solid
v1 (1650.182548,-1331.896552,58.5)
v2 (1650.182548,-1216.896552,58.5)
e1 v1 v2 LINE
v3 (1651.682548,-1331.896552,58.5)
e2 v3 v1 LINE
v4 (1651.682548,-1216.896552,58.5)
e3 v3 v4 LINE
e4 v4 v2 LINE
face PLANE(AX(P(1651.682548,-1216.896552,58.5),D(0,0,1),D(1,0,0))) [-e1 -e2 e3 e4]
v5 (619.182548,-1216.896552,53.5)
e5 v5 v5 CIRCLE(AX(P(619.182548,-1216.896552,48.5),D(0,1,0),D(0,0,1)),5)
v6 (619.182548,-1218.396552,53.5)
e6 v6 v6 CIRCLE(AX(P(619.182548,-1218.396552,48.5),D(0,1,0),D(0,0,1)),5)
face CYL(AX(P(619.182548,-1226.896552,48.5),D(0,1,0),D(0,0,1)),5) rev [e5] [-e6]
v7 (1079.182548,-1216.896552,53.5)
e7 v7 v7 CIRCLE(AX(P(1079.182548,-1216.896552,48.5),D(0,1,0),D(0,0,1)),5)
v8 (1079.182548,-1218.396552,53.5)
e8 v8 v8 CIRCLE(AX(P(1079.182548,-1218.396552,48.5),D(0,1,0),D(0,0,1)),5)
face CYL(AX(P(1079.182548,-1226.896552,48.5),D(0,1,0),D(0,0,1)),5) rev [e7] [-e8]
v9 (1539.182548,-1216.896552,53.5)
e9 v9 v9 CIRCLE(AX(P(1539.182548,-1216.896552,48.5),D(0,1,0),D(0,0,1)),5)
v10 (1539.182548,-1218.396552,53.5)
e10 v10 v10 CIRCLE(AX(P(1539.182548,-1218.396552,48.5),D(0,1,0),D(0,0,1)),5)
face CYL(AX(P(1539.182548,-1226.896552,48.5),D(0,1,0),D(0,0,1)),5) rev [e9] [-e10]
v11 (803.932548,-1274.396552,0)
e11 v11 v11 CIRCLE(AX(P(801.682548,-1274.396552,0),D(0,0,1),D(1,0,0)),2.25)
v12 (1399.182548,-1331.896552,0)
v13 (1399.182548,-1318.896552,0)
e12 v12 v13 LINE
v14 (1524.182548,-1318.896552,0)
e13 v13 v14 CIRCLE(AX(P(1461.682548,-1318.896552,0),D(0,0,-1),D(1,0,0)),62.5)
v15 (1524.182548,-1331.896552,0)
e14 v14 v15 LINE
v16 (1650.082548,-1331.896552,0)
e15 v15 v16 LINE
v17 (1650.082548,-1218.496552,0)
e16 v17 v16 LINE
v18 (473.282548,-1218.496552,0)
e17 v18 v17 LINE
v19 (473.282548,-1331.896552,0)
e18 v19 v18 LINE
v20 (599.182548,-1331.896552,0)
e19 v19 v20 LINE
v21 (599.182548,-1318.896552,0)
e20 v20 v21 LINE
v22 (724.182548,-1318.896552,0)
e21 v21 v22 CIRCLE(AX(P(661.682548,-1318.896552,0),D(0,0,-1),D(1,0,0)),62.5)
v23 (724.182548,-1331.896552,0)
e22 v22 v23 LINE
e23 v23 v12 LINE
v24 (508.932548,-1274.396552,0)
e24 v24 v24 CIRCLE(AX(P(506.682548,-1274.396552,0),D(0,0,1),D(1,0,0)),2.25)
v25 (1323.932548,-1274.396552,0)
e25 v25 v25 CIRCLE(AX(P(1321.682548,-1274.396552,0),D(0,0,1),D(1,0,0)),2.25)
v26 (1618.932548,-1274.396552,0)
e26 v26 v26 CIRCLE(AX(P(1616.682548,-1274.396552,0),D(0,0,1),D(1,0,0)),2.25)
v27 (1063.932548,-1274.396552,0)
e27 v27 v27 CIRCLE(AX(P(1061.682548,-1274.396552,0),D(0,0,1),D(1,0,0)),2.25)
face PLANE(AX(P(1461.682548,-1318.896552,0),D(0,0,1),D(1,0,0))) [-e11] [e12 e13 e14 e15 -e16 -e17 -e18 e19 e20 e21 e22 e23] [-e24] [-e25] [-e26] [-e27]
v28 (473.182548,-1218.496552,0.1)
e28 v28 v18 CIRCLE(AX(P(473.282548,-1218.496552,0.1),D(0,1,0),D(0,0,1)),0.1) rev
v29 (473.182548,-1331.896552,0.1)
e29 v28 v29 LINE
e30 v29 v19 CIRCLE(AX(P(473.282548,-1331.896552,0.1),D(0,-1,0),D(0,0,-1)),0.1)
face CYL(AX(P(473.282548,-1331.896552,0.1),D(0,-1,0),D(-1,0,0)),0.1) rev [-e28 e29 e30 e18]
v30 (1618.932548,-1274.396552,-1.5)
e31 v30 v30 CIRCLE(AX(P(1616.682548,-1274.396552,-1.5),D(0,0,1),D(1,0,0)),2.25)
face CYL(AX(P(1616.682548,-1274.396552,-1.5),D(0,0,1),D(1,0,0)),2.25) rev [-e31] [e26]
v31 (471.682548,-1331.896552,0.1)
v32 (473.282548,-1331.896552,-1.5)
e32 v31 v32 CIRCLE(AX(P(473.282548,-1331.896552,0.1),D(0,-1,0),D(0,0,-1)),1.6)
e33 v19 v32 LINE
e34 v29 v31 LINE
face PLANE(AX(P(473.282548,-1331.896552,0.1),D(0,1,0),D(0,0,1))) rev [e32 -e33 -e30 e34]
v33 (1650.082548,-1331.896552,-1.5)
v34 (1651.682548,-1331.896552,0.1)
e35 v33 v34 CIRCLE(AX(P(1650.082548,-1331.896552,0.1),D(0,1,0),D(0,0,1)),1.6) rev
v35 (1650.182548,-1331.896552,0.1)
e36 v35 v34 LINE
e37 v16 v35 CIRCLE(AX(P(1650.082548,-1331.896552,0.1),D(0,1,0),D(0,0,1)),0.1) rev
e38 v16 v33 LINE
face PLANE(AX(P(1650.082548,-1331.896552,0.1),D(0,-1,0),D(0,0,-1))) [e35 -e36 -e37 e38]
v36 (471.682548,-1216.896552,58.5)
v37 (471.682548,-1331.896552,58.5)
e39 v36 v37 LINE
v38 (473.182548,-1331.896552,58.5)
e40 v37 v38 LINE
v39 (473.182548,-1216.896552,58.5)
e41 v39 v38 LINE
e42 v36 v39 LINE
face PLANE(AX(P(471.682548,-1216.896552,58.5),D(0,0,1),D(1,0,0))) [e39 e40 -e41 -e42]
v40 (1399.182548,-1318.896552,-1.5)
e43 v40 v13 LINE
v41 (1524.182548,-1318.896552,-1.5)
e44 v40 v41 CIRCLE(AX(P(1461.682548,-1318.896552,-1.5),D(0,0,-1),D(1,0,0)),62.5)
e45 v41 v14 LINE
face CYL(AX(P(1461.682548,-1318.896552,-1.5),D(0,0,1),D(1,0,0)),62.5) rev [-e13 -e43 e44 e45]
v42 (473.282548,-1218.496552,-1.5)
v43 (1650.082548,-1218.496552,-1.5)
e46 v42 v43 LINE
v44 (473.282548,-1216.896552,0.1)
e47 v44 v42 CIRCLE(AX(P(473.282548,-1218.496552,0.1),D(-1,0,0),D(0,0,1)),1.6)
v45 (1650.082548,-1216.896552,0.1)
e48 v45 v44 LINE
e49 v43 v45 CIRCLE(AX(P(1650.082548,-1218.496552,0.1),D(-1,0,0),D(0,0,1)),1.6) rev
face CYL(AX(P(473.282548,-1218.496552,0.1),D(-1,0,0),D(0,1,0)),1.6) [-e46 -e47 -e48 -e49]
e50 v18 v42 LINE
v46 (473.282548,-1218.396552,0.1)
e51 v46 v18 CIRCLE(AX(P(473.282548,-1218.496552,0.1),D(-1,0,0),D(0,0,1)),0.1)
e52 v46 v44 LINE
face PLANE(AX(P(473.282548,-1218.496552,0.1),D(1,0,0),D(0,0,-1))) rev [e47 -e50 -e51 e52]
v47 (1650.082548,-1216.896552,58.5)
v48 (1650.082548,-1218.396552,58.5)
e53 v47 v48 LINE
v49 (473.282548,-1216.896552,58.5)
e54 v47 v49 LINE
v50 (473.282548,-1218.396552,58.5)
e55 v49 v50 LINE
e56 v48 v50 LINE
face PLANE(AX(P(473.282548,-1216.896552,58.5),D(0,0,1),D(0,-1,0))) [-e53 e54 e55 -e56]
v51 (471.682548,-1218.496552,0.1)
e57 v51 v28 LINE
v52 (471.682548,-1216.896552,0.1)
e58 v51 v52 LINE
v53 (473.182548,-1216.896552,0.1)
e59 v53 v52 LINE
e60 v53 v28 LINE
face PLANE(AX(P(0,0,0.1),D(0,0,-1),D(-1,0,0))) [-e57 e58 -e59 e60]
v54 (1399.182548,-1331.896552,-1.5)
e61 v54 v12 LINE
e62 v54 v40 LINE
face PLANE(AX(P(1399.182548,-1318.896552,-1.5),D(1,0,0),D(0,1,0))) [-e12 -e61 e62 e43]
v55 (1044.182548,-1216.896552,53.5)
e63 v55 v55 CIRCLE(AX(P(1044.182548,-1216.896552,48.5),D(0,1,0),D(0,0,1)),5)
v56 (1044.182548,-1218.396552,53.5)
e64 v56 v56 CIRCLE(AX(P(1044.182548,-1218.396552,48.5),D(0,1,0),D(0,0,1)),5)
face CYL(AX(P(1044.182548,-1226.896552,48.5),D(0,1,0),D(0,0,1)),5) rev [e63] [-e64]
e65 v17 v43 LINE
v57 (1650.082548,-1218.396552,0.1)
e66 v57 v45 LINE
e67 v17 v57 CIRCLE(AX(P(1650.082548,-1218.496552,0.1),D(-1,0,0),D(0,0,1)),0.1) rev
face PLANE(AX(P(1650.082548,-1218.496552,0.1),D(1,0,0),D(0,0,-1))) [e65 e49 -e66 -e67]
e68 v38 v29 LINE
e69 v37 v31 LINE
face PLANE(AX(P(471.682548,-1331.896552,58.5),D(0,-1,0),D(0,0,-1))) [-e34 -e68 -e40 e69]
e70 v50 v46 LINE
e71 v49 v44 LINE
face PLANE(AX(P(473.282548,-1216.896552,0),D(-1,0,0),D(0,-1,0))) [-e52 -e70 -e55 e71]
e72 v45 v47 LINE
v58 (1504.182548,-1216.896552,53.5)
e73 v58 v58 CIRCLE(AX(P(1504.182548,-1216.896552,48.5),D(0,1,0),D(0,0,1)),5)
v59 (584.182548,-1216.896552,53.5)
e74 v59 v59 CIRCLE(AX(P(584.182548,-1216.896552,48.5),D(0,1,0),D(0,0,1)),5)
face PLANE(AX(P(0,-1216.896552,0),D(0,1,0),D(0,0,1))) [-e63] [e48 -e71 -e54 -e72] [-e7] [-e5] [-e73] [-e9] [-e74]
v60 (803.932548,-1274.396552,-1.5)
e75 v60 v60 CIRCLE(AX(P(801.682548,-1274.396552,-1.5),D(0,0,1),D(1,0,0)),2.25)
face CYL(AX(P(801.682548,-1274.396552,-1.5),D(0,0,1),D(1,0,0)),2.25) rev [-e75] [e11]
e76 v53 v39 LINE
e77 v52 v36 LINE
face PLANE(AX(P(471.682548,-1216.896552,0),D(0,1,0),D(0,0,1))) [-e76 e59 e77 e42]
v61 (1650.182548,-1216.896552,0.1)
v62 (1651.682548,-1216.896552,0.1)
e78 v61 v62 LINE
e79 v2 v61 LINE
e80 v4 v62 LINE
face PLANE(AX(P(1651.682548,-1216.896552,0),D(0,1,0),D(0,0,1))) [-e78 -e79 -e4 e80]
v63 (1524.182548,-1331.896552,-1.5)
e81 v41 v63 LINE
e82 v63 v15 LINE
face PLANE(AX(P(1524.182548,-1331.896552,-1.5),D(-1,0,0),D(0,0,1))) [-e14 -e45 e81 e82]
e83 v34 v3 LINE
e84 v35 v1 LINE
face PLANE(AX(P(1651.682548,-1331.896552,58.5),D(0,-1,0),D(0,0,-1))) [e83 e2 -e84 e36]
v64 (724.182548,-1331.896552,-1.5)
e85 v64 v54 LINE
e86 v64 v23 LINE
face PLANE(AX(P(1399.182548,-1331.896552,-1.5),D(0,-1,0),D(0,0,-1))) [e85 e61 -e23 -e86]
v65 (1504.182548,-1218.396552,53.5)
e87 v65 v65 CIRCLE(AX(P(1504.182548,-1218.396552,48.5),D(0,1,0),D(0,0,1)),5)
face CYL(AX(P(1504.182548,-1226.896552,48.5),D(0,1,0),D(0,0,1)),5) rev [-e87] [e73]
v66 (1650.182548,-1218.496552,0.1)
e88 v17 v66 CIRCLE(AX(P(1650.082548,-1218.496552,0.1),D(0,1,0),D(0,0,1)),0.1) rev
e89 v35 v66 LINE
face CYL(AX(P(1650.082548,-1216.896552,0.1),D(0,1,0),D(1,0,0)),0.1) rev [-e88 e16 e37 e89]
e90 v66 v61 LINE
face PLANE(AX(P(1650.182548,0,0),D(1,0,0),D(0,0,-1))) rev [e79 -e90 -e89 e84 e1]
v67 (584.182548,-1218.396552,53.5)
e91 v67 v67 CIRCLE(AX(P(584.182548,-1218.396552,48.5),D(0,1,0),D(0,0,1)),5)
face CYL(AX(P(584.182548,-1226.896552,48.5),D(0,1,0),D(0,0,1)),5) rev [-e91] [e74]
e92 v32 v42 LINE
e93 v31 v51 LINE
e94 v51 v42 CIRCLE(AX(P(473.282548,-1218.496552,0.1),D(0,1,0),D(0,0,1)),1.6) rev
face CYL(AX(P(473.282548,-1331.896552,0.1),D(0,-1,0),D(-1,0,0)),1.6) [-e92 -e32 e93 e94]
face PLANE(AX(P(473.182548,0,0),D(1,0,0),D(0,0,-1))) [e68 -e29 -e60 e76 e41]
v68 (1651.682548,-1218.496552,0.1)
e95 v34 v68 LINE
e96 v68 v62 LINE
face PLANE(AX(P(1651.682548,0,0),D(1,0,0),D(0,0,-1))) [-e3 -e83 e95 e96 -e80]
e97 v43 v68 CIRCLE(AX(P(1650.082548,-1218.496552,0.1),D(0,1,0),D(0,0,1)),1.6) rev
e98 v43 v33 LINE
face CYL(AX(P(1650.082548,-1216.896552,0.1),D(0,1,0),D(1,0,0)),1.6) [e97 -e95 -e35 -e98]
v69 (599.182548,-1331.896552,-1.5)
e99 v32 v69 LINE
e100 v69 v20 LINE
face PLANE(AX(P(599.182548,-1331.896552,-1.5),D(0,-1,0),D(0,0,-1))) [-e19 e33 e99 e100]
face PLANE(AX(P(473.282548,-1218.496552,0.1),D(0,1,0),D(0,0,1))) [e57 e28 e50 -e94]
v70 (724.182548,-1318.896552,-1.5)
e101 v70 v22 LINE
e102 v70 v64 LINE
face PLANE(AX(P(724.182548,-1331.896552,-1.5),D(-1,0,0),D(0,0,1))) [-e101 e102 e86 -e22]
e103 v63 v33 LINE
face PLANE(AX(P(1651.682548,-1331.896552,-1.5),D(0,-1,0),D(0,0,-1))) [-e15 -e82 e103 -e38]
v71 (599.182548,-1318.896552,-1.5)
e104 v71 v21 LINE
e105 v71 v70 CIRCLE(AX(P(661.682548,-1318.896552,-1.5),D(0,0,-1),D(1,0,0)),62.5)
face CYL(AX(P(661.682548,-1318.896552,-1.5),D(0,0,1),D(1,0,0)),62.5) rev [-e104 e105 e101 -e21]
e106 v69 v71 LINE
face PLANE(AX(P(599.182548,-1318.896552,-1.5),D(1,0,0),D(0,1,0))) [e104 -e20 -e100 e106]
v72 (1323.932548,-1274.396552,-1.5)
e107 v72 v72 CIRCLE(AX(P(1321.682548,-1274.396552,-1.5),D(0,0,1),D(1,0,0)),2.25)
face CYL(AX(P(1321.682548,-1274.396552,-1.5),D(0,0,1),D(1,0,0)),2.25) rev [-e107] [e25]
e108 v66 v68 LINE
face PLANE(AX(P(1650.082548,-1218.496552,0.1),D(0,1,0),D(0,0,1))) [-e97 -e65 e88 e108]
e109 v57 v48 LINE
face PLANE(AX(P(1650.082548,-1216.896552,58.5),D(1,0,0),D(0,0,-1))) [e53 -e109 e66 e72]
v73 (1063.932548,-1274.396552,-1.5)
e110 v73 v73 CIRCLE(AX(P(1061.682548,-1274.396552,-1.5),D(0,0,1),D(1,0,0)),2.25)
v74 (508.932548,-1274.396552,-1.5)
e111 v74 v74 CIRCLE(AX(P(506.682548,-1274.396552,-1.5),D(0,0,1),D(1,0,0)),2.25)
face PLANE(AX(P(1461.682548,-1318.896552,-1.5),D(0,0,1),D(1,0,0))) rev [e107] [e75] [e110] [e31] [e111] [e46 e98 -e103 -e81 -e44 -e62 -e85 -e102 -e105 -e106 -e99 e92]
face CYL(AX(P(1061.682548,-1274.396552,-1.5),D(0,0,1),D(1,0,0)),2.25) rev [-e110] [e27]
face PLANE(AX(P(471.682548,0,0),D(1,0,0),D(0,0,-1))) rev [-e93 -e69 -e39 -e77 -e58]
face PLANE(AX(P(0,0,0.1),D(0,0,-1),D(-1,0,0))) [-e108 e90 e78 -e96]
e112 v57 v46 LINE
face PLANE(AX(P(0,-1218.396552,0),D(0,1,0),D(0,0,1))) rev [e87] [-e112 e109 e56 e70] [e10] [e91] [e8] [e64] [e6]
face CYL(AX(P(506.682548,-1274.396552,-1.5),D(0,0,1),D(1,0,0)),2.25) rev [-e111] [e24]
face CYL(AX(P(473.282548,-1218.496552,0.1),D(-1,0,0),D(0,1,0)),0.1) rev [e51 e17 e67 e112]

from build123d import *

# Parameters (mm, degrees)
SKETCH_1_R                         = 2.25
SM_BASE_FLANGE_1_DEPTH             = 1.5
SM_EDGE_FLANGE_1_STRIP_W           = 6.2
SM_EDGE_FLANGE_1_STRIP_H           = 1.5
SM_EDGE_FLANGE_1_STRIP_CUT_DEPTH   = 115
SM_EDGE_FLANGE_1_STRIP_2_W         = 6.2
SM_EDGE_FLANGE_1_STRIP_2_H         = 1.5
SM_EDGE_FLANGE_1_STRIP_CUT_2_DEPTH = 115
SM_EDGE_FLANGE_1_DEPTH             = 115
SM_EDGE_FLANGE_1_BEND_DEPTH        = 115
SM_START                           = 471.682547587
SM_EDGE_FLANGE_2_DEPTH             = 1180
SM_EDGE_FLANGE_2_2_DEPTH           = 1.6
SM_START_2                         = 1650.082547587
SM_EDGE_FLANGE_2_3_DEPTH           = 1.6
SM_START_3                         = 473.282547587
SM_EDGE_FLANGE_2_4_DEPTH           = 1176.8
SKETCH_15_R                        = 5
CUT_EXTRUDE_1_DEPTH                = 10


# Read off the part's stored shape, not the designer's step: 边线-法兰2
# Sheet-metal steps are written as plain solids
with BuildPart() as part:
    # Sketch 1 → 基体-法兰1 (new body)
    with BuildSketch(Plane.XY):
        with BuildLine():
            Line((471.682547587, -1331.896552128), (473.182547587, -1331.896552128))
            Line((473.182547587, -1331.896552128), (473.919147587, -1331.896552128))
            Line((473.919147587, -1331.896552128), (599.182547587, -1331.896552128))
            Line((599.182547587, -1331.896552128), (599.182547587, -1318.896552128))
            ThreePointArc((599.182547587, -1318.896552128), (661.682547587, -1256.396552128), (724.182547587, -1318.896552128))
            Line((724.182547587, -1318.896552128), (724.182547587, -1331.896552128))
            Line((724.182547587, -1331.896552128), (1399.182547587, -1331.896552128))
            Line((1399.182547587, -1331.896552128), (1399.182547587, -1318.896552128))
            ThreePointArc((1399.182547587, -1318.896552128), (1461.682547587, -1256.396552128), (1524.182547587, -1318.896552128))
            Line((1524.182547587, -1318.896552128), (1524.182547587, -1331.896552128))
            Line((1524.182547587, -1331.896552128), (1649.445947587, -1331.896552128))
            Line((1649.445947587, -1331.896552128), (1650.182547587, -1331.896552128))
            Line((1650.182547587, -1331.896552128), (1651.682547587, -1331.896552128))
            Line((1651.682547587, -1331.896552128), (1651.682547587, -1216.896552128))
            Line((1651.682547587, -1216.896552128), (471.682547587, -1216.896552128))
            Line((471.682547587, -1216.896552128), (471.682547587, -1331.896552128))
        make_face()
        with Locations((801.682547587, -1274.396552128)):
            Circle(SKETCH_1_R, mode=Mode.SUBTRACT)
        with Locations((1321.682547587, -1274.396552128)):
            Circle(SKETCH_1_R, mode=Mode.SUBTRACT)
        with Locations((506.682547587, -1274.396552128)):
            Circle(SKETCH_1_R, mode=Mode.SUBTRACT)
        with Locations((1061.682547587, -1274.396552128)):
            Circle(SKETCH_1_R, mode=Mode.SUBTRACT)
        with Locations((1616.682547587, -1274.396552128)):
            Circle(SKETCH_1_R, mode=Mode.SUBTRACT)
    extrude(amount=-SM_BASE_FLANGE_1_DEPTH)

    # 边线-法兰1 strip (across the edge) → 边线-法兰1 strip cut (cut)
    with BuildSketch(Plane(origin=(1651.682547587, -1331.896552128, 0), x_dir=(-1, 0, 0), z_dir=(0, 1, 0))):
        with Locations((-1.5, -0.75)):
            Rectangle(SM_EDGE_FLANGE_1_STRIP_W, SM_EDGE_FLANGE_1_STRIP_H)
    extrude(amount=SM_EDGE_FLANGE_1_STRIP_CUT_DEPTH, mode=Mode.SUBTRACT)

    # 边线-法兰1 strip 2 (across the edge) → 边线-法兰1 strip cut 2 (cut)
    with BuildSketch(Plane(origin=(471.682547587, -1216.896552128, 0), x_dir=(1, 0, 0), z_dir=(0, -1, 0))):
        with Locations((-1.5, -0.75)):
            Rectangle(SM_EDGE_FLANGE_1_STRIP_2_W, SM_EDGE_FLANGE_1_STRIP_2_H)
    extrude(amount=SM_EDGE_FLANGE_1_STRIP_CUT_2_DEPTH, mode=Mode.SUBTRACT)

    # 边线-法兰1 section (across the edge) → 边线-法兰1 (add)
    with BuildSketch(Plane(origin=(1651.682547587, -1331.896552128, 0), x_dir=(-1, 0, 0), z_dir=(0, 1, 0))):
        with BuildLine():
            Line((0, 0.1), (0, 58.5))
            Line((0, 58.5), (1.5, 58.5))
            Line((1.5, 58.5), (1.5, 0.1))
            ThreePointArc((1.5, 0.1), (1.529289322, 0.029289322), (1.6, 0))
            Line((1.6, 0), (1.6, -1.5))
            ThreePointArc((1.6, -1.5), (0.46862915, -1.03137085), (0, 0.1))
        make_face()
    extrude(amount=SM_EDGE_FLANGE_1_DEPTH)

    # 边线-法兰1 section 2 (across the edge) → 边线-法兰1 bend (add)
    with BuildSketch(Plane(origin=(471.682547587, -1216.896552128, 0), x_dir=(1, 0, 0), z_dir=(0, -1, 0))):
        with BuildLine():
            Line((0, 0.1), (0, 58.5))
            Line((0, 58.5), (1.5, 58.5))
            Line((1.5, 58.5), (1.5, 0.1))
            ThreePointArc((1.5, 0.1), (1.529289322, 0.029289322), (1.6, 0))
            Line((1.6, 0), (1.6, -1.5))
            ThreePointArc((1.6, -1.5), (0.46862915, -1.03137085), (0, 0.1))
        make_face()
    extrude(amount=SM_EDGE_FLANGE_1_BEND_DEPTH)

    # 边线-法兰2 outline → 边线-法兰2 (cut)
    with BuildSketch(Plane.YZ.offset(SM_START)):
        with BuildLine():
            Line((-1218.396552128, 0.1), (-1218.496552128, 0.1))
            Line((-1218.496552128, 0.1), (-1218.496552128, 0))
            ThreePointArc((-1218.496552128, 0), (-1218.42584145, 0.029289322), (-1218.396552128, 0.1))
        make_face()
        with BuildLine():
            ThreePointArc((-1216.896552128, 0.1), (-1217.365181278, -1.03137085), (-1218.496552128, -1.5))
            Line((-1218.496552128, -1.5), (-1216.896552128, -1.5))
            Line((-1216.896552128, -1.5), (-1216.896552128, 0.1))
        make_face()
    extrude(amount=SM_EDGE_FLANGE_2_DEPTH, mode=Mode.SUBTRACT)

    # Sm Edge Flange 2 2 outline → Sm Edge Flange 2 2 (cut)
    with BuildSketch(Plane.YZ.offset(SM_START)):
        with BuildLine():
            Line((-1216.896552128, 0.1), (-1218.396552128, 0.1))
            ThreePointArc((-1218.396552128, 0.1), (-1218.42584145, 0.029289322), (-1218.496552128, 0))
            Line((-1218.496552128, 0), (-1218.496552128, -1.5))
            ThreePointArc((-1218.496552128, -1.5), (-1217.365181278, -1.03137085), (-1216.896552128, 0.1))
        make_face()
    extrude(amount=SM_EDGE_FLANGE_2_2_DEPTH, mode=Mode.SUBTRACT)

    # Sm Edge Flange 2 3 outline → Sm Edge Flange 2 3 (cut)
    with BuildSketch(Plane.YZ.offset(SM_START_2)):
        with BuildLine():
            Line((-1216.896552128, 0.1), (-1218.396552128, 0.1))
            ThreePointArc((-1218.396552128, 0.1), (-1218.42584145, 0.029289322), (-1218.496552128, 0))
            Line((-1218.496552128, 0), (-1218.496552128, -1.5))
            ThreePointArc((-1218.496552128, -1.5), (-1217.365181278, -1.03137085), (-1216.896552128, 0.1))
        make_face()
    extrude(amount=SM_EDGE_FLANGE_2_3_DEPTH, mode=Mode.SUBTRACT)

    # Sm Edge Flange 2 4 outline → Sm Edge Flange 2 4 (add)
    with BuildSketch(Plane.YZ.offset(SM_START_3)):
        with BuildLine():
            Line((-1218.396552128, 58.5), (-1218.396552128, 0.1))
            ThreePointArc((-1218.396552128, 0.1), (-1218.42584145, 0.029289322), (-1218.496552128, 0))
            Line((-1218.496552128, 0), (-1216.899680186, 0))
            ThreePointArc((-1216.899680186, 0), (-1216.897334334, 0.049975544), (-1216.896552128, 0.1))
            Line((-1216.896552128, 0.1), (-1216.896552128, 58.5))
            Line((-1216.896552128, 58.5), (-1218.396552128, 58.5))
        make_face()
    extrude(amount=SM_EDGE_FLANGE_2_4_DEPTH)

    # 草图15 → 切除-拉伸1 (cut)
    with BuildSketch(Plane(origin=(0, -1216.896552128, 0), x_dir=(1, 0, 0), z_dir=(0, 1, 0))):
        with Locations(Location((619.182547587, -48.5, 0), (0, 0, 270))):
            Circle(SKETCH_15_R)
        with Locations(Location((584.182547587, -48.5, 0), (0, 0, 270))):
            Circle(SKETCH_15_R)
        with Locations(Location((1079.182547587, -48.5, 0), (0, 0, 270))):
            Circle(SKETCH_15_R)
        with Locations(Location((1044.182547587, -48.5, 0), (0, 0, 270))):
            Circle(SKETCH_15_R)
        with Locations(Location((1504.182547587, -48.5, 0), (0, 0, 270))):
            Circle(SKETCH_15_R)
        with Locations(Location((1539.182547587, -48.5, 0), (0, 0, 270))):
            Circle(SKETCH_15_R)
    extrude(amount=-CUT_EXTRUDE_1_DEPTH, mode=Mode.SUBTRACT)


solid = part.part
